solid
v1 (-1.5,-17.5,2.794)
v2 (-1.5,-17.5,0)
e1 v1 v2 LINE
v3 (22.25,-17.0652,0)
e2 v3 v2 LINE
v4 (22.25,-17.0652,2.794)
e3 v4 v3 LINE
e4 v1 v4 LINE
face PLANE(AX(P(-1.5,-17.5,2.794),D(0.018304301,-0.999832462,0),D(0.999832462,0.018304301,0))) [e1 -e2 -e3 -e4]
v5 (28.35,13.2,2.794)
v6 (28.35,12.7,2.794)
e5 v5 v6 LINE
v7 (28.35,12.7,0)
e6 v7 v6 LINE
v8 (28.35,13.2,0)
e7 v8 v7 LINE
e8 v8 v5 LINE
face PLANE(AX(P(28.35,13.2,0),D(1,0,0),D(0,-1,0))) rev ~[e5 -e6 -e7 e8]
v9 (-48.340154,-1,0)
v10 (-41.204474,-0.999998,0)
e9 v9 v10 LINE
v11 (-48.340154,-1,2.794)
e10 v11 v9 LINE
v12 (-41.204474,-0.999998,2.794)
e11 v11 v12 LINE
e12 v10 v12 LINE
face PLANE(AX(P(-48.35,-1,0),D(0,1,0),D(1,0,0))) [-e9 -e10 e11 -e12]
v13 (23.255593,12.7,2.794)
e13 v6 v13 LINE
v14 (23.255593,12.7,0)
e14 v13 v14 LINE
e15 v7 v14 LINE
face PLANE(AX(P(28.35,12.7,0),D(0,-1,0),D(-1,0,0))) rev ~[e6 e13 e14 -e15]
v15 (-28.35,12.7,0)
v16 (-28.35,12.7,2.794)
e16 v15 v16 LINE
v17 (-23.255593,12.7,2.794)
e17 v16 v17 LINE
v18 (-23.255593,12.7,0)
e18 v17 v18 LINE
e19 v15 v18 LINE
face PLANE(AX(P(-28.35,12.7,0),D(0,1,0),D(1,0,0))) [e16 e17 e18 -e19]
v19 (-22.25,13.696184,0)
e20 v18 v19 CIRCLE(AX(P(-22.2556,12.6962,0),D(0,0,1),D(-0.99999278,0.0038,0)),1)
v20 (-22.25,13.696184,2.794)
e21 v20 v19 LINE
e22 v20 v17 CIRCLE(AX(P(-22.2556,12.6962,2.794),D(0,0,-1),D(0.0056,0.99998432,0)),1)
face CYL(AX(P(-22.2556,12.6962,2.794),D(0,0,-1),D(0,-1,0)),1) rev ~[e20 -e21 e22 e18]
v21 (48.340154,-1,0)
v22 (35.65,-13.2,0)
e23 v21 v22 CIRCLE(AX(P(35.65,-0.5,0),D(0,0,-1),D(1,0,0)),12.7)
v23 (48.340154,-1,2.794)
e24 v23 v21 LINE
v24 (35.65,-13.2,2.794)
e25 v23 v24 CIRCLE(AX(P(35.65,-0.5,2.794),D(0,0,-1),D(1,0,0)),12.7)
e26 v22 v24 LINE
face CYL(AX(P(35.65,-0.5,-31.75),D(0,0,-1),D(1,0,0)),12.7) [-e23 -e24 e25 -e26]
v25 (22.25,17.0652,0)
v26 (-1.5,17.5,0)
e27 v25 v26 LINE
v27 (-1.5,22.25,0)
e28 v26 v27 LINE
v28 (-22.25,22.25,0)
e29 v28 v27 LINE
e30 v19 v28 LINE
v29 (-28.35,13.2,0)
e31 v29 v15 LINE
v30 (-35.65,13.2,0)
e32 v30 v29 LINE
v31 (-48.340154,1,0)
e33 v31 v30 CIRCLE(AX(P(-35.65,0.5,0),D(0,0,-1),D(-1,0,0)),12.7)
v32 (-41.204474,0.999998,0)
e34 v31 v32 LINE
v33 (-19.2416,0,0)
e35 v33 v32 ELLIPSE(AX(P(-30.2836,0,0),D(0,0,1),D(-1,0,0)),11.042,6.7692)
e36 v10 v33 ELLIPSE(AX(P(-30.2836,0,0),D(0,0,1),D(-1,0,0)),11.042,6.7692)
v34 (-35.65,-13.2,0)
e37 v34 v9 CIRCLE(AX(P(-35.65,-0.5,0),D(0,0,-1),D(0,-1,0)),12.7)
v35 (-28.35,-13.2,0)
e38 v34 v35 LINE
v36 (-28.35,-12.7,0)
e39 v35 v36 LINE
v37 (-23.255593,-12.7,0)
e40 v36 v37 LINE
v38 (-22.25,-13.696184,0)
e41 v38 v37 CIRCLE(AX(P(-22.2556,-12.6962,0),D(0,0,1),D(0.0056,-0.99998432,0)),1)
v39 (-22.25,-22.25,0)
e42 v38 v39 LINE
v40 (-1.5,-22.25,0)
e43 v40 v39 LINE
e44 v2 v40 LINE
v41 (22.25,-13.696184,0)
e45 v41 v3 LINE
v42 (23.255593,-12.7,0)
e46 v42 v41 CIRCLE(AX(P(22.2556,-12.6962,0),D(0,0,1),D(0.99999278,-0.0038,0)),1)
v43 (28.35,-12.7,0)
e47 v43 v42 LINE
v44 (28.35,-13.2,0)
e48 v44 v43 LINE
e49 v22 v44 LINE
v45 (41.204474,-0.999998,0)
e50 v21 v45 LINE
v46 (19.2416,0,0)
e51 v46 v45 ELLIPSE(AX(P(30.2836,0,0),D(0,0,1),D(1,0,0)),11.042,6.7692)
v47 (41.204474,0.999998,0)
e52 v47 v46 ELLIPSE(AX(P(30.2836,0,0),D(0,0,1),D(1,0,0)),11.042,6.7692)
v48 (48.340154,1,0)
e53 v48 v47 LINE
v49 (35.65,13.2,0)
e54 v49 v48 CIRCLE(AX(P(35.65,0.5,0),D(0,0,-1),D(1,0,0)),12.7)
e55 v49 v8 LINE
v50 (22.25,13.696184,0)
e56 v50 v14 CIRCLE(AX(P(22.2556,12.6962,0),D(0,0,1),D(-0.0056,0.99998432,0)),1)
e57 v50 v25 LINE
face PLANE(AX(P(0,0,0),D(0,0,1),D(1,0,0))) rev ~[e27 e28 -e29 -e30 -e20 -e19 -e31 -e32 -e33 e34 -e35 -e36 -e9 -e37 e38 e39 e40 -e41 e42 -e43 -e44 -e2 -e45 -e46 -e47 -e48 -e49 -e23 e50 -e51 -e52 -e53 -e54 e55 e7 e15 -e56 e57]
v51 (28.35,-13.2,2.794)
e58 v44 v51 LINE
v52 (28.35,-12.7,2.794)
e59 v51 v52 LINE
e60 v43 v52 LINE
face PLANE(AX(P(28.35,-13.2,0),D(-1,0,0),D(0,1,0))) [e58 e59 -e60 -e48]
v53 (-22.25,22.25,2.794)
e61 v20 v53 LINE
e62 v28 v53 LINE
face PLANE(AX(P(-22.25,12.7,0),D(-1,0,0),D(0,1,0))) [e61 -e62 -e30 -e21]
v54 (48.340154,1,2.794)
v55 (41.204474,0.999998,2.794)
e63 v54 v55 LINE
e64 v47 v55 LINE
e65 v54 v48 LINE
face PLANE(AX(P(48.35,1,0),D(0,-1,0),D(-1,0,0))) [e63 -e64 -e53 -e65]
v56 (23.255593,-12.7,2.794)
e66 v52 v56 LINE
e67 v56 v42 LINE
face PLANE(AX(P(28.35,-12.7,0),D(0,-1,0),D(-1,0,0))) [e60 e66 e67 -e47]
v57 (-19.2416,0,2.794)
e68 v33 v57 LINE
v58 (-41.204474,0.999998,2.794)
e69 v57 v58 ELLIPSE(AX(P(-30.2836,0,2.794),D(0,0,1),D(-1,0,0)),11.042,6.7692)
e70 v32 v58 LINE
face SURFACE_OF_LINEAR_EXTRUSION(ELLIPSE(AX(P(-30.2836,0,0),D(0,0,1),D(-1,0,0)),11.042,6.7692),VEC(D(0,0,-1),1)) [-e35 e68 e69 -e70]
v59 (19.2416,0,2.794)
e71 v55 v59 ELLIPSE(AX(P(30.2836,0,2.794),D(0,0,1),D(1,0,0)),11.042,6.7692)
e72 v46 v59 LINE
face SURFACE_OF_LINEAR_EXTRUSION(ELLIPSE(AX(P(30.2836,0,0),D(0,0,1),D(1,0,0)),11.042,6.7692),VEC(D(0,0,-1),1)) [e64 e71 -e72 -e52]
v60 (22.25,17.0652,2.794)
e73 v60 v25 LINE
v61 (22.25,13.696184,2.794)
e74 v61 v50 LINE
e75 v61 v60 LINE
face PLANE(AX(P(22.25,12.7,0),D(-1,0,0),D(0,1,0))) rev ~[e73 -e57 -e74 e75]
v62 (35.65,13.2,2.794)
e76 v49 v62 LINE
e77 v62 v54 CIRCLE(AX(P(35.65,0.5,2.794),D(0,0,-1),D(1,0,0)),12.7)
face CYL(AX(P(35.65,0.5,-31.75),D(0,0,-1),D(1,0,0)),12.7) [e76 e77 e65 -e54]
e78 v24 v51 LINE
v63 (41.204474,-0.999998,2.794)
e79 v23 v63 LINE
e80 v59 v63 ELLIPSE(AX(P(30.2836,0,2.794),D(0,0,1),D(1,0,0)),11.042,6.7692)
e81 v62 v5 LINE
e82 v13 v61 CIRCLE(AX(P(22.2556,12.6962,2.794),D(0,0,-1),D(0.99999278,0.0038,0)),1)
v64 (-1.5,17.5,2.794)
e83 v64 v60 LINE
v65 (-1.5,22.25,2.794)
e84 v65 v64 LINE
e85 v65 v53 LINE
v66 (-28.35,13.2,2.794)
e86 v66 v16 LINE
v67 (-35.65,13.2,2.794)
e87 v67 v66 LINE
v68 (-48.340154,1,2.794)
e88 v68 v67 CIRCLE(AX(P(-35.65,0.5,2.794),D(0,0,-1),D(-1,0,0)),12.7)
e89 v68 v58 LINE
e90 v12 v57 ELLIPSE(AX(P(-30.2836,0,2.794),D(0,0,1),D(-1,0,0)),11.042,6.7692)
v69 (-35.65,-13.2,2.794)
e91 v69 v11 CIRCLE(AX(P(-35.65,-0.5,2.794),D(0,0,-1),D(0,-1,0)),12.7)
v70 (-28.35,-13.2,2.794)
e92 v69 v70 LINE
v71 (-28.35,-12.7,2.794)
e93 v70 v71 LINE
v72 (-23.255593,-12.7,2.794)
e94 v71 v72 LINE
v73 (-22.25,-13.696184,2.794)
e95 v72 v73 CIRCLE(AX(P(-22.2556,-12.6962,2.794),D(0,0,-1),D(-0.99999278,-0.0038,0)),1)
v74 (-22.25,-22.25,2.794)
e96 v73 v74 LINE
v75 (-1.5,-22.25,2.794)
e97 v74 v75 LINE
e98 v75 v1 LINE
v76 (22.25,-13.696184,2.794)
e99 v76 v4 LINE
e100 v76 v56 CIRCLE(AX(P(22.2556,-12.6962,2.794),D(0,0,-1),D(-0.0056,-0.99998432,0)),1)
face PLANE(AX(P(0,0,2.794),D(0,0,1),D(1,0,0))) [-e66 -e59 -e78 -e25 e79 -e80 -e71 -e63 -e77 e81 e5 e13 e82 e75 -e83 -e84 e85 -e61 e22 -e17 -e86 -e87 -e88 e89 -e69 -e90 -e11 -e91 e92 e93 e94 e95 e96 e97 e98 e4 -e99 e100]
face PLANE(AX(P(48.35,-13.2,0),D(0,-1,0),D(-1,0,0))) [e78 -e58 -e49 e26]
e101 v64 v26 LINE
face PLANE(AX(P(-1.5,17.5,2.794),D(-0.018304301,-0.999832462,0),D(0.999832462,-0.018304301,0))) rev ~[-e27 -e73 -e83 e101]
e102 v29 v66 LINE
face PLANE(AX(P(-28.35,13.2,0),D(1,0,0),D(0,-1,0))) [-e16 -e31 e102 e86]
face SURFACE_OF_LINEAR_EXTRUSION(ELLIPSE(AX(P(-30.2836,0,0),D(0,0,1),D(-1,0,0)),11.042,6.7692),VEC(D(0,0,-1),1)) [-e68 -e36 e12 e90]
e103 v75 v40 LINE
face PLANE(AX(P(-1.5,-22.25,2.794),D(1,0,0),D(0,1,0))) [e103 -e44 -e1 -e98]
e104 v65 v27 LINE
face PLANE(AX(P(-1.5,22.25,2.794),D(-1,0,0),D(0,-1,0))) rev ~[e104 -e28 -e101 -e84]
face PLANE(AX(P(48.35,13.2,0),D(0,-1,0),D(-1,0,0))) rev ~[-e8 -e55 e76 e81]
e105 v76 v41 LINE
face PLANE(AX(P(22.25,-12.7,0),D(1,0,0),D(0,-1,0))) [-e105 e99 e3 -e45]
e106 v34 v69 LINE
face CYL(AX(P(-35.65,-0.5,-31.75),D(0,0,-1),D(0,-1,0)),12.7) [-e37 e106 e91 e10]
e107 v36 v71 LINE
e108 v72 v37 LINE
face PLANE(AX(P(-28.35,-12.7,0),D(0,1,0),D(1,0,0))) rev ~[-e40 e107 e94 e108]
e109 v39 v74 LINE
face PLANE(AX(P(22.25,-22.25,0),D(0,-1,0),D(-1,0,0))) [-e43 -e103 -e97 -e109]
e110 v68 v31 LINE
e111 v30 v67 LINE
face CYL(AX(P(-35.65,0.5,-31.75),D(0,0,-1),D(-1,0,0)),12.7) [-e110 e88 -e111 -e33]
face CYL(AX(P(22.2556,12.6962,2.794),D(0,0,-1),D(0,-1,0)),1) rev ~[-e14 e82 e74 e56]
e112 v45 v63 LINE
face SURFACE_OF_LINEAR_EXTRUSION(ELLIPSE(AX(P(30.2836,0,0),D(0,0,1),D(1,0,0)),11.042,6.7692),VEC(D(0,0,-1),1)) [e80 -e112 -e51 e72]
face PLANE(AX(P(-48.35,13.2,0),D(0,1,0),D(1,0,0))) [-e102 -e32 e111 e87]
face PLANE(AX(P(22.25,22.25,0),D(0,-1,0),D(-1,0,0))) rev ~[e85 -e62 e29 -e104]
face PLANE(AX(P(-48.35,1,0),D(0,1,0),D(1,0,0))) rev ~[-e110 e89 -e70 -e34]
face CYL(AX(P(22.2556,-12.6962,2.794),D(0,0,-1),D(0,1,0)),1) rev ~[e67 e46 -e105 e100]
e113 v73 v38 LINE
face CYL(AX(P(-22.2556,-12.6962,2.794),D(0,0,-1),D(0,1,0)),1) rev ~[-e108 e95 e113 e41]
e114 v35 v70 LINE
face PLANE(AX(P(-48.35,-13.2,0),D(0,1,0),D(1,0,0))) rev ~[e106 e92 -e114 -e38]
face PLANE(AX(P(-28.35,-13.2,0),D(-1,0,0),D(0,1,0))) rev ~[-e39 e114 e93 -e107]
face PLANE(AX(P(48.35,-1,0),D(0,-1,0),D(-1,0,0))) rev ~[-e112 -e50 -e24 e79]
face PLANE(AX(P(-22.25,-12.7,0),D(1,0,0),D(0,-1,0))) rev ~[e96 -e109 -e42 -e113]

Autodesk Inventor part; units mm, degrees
ref_plane "YZ Plane" through (0, 0, 0) normal (1, 0, 0) x (0, 1, 0)
ref_plane "XZ Plane" through (0, 0, 0) normal (0, 1, 0) x (-1, 0, 0)
ref_plane "XY Plane" through (0, 0, 0) normal (0, 0, 1) x (1, 0, 0)
sketch "Sketch1" plane through (0, 0, 0) normal (0, 0, 1) x (1, 0, 0)
  line L0 (48.35, 0) -> (48.35, 13.2)
  line L1 (48.35, 13.2) -> (28.35, 13.2)
  line L2 (28.35, 13.2) -> (28.35, 12.7)
  line L3 (28.35, 12.7) -> (22.25, 12.7)
  line L4 (12.2521, 0) -> (48.35, 0)
  line L5 (22.25, 12.7) -> (22.25, 22.25)
  line L6 (22.25, 22.25) -> (0, 22.25)
  line L7 (48.35, 1) -> (41.2045, 1)
  line L8 (48.35, 0) -> (48.35, -13.2)
  line L9 (48.35, -13.2) -> (28.35, -13.2)
  line L10 (28.35, -13.2) -> (28.35, -12.7)
  line L11 (28.35, -12.7) -> (22.25, -12.7)
  line L12 (22.25, -12.7) -> (22.25, -22.25)
  line L13 (22.25, -22.25) -> (0, -22.25)
  line L14 (48.35, -1) -> (41.2045, -1)
  line L15 (0, 22.25) -> (0, -22.25)
  ellipse E0 centre (30.2836, 0) end of major axis (41.3256, 0) minor radius 6.7692 (41.2045, 1) -> (41.2045, -1) ccw
  point P0 (0, 0)
  point P1 (17.8114, 0)
  point P2 (41.275, 1)
  point P3 (41.275, -1)
  dimension "d0" = 13.2
  dimension "d1" = 20
  dimension "d6" = 12.7
  dimension "d7" = 22.25
  dimension "d8" = 22.25
  dimension "d9" = 6.1
  dimension "d17" = 48.35
  dimension "d34" = 1
extrude "Extrusion2" add sketch "Sketch1" along normal blind 2.794 contours L7 E0 L14 L8 L9 L10 L11 L12 L13 L15 L6 L5 L3 L2 L1 L0
pattern_circular "Circular Pattern1" count 2 over 360 about axis through (0, 0, -10) along (0, 0, 1) of "Extrusion2"
fillet "Fillet2" radius 12.7 2 edges at (48.35, 13.2, 1.397) (48.35, -13.2, 1.397)
fillet "Fillet3" radius 12.7 2 edges at (-48.35, -13.2, 1.397) (-48.35, 13.2, 1.397)
sketch "Sketch3" plane through (0, 0, 2.794) normal (0, 0, 1) x (1, 0, 0)
  line L0 (22.25, 12.7) -> (22.25, 22.25) projected
  line L1 (22.25, 22.25) -> (-22.25, 22.25) projected
  line L2 (-1.5, 17.5) -> (22.25, 17.0652)
  line L3 (22.25, 22.25) -> (22.25, 17.0652)
  line L4 (0, 0) -> (6.35, 0)
  line L5 (22.25, -12.7) -> (22.25, -22.25)
  line L6 (22.25, -22.25) -> (22.25, -17.0652)
  line L7 (-28.35, 13.2) -> (-35.6598, 13.2) projected
  line L8 (-1.5, 22.25) -> (-1.5, 17.5)
  line L9 (21.8285, 22.25) -> (-1.5, 22.25)
  line L10 (22.25, -12.7) -> (22.25, -22.25)
  line L11 (22.25, -22.25) -> (-22.25, -22.25)
  line L12 (-1.5, -17.5) -> (22.25, -17.0652)
  line L13 (-1.5, -22.25) -> (-1.5, -17.5)
  point P0 (0, 22.25)
  dimension "d32" = 1.5
  dimension "d33" = 17.5
extrude "Extrusion4" cut sketch "Sketch3" against normal up to next
hole "Hole1" at (22.2556, 12.6962, 2.794) direction (0, 0, -1) diameter 2 end through all
mirror "Mirror1" about plane through (0, 0, 0) normal (1, 0, 0) of "Hole1"
mirror "Mirror2" about plane through (0, 0, 0) normal (0, 1, 0) of "Hole1", "Mirror1"
equation "\"d7\" = d8"
properties part number "LockZ"
